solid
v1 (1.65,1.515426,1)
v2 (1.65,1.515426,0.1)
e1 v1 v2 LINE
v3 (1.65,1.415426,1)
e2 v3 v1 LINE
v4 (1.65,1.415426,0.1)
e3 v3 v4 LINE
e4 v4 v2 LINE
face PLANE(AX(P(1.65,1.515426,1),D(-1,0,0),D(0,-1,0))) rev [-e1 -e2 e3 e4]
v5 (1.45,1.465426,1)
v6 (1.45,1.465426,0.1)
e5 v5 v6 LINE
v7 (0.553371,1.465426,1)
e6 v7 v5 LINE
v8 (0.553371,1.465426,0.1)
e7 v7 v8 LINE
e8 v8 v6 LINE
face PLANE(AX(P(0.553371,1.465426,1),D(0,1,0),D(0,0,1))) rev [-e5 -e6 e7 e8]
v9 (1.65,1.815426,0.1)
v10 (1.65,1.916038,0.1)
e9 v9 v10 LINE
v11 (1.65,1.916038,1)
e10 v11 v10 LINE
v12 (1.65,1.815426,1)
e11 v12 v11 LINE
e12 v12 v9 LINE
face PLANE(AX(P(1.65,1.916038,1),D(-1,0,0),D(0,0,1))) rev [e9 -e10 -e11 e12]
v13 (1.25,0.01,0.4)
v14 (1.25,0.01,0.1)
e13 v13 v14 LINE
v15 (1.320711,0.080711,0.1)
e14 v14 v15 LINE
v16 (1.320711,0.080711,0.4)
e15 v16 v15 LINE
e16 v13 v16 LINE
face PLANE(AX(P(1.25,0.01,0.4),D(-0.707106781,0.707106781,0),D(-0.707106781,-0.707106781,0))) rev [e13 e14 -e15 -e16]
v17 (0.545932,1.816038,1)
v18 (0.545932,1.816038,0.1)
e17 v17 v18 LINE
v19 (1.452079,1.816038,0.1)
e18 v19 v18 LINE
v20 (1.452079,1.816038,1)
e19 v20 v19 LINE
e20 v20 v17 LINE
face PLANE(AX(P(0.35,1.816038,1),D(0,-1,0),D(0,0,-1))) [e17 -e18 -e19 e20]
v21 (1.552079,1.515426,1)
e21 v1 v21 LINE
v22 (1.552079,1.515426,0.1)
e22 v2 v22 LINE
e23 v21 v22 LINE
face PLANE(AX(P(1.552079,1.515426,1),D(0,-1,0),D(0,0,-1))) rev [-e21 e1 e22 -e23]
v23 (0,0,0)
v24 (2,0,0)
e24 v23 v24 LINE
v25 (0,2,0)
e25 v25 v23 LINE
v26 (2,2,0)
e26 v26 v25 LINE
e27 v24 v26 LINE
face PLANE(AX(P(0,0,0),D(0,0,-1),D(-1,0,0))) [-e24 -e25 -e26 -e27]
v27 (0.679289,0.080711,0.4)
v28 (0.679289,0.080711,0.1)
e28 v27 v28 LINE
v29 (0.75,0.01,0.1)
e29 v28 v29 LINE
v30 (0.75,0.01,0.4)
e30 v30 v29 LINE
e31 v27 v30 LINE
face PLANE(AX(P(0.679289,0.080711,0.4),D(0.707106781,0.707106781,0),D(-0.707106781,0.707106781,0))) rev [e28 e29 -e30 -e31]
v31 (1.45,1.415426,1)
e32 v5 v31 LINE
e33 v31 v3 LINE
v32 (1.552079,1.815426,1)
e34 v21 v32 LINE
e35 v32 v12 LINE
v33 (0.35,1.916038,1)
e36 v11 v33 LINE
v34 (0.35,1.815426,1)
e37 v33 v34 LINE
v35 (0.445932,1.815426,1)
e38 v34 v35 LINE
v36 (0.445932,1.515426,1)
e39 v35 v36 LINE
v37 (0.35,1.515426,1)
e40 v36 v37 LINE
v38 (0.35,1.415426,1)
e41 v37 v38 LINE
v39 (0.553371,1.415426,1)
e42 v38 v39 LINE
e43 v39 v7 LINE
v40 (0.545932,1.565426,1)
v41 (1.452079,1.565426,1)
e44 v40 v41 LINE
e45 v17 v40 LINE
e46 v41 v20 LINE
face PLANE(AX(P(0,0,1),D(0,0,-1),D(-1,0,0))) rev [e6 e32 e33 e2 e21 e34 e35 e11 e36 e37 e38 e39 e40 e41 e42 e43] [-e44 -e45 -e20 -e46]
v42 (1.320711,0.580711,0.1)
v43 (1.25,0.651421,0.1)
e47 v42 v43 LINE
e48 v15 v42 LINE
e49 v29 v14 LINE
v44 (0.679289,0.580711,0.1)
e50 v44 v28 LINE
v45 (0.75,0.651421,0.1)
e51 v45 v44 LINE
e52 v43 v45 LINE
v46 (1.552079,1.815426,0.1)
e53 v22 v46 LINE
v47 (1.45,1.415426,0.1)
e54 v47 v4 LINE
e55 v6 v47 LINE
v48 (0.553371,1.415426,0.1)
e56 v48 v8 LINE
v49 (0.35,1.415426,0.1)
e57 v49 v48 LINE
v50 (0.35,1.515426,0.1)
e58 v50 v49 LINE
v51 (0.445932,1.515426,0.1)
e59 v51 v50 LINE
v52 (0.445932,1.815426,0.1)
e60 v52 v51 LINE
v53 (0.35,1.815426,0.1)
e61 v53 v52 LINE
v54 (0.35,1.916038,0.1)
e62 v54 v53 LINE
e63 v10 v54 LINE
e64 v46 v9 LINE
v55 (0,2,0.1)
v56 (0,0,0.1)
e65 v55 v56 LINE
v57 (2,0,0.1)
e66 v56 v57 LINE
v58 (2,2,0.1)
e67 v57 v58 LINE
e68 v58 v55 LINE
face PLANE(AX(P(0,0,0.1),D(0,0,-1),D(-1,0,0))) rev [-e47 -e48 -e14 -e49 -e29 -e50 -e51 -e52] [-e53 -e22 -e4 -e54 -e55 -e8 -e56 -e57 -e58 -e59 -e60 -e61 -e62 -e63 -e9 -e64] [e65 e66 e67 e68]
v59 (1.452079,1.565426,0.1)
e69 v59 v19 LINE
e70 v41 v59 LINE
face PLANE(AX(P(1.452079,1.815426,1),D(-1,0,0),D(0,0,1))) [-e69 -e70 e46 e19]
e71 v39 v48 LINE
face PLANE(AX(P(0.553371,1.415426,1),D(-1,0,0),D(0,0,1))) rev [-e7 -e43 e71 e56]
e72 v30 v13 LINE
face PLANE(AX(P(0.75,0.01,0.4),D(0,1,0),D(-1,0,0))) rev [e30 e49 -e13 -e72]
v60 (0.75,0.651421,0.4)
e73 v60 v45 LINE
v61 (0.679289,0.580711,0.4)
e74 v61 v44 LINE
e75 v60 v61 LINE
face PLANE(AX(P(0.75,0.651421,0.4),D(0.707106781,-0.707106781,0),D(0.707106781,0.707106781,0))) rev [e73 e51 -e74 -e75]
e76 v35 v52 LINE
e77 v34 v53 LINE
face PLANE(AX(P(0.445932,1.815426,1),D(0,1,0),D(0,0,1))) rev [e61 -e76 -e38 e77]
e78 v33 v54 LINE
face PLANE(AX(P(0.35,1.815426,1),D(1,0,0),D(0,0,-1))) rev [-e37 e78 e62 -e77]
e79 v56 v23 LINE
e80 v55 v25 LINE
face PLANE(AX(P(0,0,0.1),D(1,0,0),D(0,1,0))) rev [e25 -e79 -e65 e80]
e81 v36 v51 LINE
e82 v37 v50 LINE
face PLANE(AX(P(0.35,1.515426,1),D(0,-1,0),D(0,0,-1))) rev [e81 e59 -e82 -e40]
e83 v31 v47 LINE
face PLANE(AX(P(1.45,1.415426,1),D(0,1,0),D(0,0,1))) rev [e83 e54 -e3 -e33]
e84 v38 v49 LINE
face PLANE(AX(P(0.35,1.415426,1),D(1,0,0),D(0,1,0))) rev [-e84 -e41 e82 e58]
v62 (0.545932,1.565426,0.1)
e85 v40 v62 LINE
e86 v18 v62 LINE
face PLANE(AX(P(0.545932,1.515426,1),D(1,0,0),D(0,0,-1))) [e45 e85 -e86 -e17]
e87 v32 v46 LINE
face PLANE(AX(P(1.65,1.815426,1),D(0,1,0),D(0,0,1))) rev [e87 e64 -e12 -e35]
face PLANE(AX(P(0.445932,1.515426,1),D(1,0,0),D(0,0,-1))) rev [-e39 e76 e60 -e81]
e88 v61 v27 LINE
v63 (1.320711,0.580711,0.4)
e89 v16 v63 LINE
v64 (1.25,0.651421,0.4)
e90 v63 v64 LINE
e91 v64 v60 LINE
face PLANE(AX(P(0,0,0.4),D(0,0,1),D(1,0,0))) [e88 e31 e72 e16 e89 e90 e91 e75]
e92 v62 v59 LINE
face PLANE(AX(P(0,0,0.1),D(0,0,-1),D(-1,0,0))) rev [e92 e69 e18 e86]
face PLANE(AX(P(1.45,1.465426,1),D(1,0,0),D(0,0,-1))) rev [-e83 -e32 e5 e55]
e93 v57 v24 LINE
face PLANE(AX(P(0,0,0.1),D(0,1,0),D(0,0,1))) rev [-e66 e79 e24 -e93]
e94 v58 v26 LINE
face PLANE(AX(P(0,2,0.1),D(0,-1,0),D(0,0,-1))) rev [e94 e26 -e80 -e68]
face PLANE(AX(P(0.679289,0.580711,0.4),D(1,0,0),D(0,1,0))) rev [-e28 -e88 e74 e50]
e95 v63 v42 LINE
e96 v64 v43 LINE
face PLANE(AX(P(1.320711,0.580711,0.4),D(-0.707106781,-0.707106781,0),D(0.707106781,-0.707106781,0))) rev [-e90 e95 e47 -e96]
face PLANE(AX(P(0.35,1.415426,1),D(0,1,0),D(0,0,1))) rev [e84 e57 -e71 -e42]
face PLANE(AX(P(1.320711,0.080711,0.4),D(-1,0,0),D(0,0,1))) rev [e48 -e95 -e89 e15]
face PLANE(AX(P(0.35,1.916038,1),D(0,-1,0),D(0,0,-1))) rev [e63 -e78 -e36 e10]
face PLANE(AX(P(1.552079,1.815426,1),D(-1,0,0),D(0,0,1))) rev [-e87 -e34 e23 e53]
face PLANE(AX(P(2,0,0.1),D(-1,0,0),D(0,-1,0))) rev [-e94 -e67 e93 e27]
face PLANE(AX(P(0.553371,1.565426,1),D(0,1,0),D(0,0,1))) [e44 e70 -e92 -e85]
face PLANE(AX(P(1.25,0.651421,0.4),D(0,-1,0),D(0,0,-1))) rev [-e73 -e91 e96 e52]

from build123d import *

# Parameters (mm, degrees)
ESQUISSE1_W        = 2
ESQUISSE1_H        = 2
BOSS_EXTRU_1_DEPTH = 0.1
BOSS_EXTRU_2_DEPTH = 0.9
COQUE3_START       = 0.1
COQUE3_OUTLINE_W   = 0.906146658
COQUE3_OUTLINE_H   = 0.250612044
COQUE3_DEPTH       = 0.9
BOSS_EXTRU_3_DEPTH = 0.3


# Read off the part's stored shape, not the designer's step: Coque3
with BuildPart() as part:
    # Esquisse1 → Boss.-Extru.1 (new body)
    with BuildSketch(Plane.XY):
        with Locations((1, 1)):
            Rectangle(ESQUISSE1_W, ESQUISSE1_H)
    extrude(amount=BOSS_EXTRU_1_DEPTH)

    # Esquisse2 → Boss.-Extru.2 (add)
    with BuildSketch(Plane.XY.offset(0.1)):
        Polygon((0.35, 1.916037567), (1.65, 1.916037567), (1.65, 1.815425523), (1.552079072, 1.815425523), (1.552079072, 1.515425523), (1.65, 1.515425523), (1.65, 1.415425523), (1.45, 1.415425523), (1.45, 1.465425523), (0.553370886, 1.465425523), (0.553370886, 1.415425523), (0.35, 1.415425523), (0.35, 1.515425523), (0.445932414, 1.515425523), (0.445932414, 1.815425523), (0.35, 1.815425523), align=None)
    extrude(amount=BOSS_EXTRU_2_DEPTH)

    # Coque3 outline → Coque3 (cut)
    with BuildSketch(Plane.XY.offset(COQUE3_START)):
        with Locations((0.999005743, 1.690731545)):
            Rectangle(COQUE3_OUTLINE_W, COQUE3_OUTLINE_H)
    extrude(amount=COQUE3_DEPTH, mode=Mode.SUBTRACT)

    # Esquisse3 → Boss.-Extru.3 (add)
    with BuildSketch(Plane.XY.offset(0.1)):
        Polygon((0.679289322, 0.580710678), (0.679289322, 0.080710678), (0.75, 0.01), (1.25, 0.01), (1.320710678, 0.080710678), (1.320710678, 0.580710678), (1.25, 0.651421356), (0.75, 0.651421356), align=None)
    extrude(amount=BOSS_EXTRU_3_DEPTH)


solid = part.part
